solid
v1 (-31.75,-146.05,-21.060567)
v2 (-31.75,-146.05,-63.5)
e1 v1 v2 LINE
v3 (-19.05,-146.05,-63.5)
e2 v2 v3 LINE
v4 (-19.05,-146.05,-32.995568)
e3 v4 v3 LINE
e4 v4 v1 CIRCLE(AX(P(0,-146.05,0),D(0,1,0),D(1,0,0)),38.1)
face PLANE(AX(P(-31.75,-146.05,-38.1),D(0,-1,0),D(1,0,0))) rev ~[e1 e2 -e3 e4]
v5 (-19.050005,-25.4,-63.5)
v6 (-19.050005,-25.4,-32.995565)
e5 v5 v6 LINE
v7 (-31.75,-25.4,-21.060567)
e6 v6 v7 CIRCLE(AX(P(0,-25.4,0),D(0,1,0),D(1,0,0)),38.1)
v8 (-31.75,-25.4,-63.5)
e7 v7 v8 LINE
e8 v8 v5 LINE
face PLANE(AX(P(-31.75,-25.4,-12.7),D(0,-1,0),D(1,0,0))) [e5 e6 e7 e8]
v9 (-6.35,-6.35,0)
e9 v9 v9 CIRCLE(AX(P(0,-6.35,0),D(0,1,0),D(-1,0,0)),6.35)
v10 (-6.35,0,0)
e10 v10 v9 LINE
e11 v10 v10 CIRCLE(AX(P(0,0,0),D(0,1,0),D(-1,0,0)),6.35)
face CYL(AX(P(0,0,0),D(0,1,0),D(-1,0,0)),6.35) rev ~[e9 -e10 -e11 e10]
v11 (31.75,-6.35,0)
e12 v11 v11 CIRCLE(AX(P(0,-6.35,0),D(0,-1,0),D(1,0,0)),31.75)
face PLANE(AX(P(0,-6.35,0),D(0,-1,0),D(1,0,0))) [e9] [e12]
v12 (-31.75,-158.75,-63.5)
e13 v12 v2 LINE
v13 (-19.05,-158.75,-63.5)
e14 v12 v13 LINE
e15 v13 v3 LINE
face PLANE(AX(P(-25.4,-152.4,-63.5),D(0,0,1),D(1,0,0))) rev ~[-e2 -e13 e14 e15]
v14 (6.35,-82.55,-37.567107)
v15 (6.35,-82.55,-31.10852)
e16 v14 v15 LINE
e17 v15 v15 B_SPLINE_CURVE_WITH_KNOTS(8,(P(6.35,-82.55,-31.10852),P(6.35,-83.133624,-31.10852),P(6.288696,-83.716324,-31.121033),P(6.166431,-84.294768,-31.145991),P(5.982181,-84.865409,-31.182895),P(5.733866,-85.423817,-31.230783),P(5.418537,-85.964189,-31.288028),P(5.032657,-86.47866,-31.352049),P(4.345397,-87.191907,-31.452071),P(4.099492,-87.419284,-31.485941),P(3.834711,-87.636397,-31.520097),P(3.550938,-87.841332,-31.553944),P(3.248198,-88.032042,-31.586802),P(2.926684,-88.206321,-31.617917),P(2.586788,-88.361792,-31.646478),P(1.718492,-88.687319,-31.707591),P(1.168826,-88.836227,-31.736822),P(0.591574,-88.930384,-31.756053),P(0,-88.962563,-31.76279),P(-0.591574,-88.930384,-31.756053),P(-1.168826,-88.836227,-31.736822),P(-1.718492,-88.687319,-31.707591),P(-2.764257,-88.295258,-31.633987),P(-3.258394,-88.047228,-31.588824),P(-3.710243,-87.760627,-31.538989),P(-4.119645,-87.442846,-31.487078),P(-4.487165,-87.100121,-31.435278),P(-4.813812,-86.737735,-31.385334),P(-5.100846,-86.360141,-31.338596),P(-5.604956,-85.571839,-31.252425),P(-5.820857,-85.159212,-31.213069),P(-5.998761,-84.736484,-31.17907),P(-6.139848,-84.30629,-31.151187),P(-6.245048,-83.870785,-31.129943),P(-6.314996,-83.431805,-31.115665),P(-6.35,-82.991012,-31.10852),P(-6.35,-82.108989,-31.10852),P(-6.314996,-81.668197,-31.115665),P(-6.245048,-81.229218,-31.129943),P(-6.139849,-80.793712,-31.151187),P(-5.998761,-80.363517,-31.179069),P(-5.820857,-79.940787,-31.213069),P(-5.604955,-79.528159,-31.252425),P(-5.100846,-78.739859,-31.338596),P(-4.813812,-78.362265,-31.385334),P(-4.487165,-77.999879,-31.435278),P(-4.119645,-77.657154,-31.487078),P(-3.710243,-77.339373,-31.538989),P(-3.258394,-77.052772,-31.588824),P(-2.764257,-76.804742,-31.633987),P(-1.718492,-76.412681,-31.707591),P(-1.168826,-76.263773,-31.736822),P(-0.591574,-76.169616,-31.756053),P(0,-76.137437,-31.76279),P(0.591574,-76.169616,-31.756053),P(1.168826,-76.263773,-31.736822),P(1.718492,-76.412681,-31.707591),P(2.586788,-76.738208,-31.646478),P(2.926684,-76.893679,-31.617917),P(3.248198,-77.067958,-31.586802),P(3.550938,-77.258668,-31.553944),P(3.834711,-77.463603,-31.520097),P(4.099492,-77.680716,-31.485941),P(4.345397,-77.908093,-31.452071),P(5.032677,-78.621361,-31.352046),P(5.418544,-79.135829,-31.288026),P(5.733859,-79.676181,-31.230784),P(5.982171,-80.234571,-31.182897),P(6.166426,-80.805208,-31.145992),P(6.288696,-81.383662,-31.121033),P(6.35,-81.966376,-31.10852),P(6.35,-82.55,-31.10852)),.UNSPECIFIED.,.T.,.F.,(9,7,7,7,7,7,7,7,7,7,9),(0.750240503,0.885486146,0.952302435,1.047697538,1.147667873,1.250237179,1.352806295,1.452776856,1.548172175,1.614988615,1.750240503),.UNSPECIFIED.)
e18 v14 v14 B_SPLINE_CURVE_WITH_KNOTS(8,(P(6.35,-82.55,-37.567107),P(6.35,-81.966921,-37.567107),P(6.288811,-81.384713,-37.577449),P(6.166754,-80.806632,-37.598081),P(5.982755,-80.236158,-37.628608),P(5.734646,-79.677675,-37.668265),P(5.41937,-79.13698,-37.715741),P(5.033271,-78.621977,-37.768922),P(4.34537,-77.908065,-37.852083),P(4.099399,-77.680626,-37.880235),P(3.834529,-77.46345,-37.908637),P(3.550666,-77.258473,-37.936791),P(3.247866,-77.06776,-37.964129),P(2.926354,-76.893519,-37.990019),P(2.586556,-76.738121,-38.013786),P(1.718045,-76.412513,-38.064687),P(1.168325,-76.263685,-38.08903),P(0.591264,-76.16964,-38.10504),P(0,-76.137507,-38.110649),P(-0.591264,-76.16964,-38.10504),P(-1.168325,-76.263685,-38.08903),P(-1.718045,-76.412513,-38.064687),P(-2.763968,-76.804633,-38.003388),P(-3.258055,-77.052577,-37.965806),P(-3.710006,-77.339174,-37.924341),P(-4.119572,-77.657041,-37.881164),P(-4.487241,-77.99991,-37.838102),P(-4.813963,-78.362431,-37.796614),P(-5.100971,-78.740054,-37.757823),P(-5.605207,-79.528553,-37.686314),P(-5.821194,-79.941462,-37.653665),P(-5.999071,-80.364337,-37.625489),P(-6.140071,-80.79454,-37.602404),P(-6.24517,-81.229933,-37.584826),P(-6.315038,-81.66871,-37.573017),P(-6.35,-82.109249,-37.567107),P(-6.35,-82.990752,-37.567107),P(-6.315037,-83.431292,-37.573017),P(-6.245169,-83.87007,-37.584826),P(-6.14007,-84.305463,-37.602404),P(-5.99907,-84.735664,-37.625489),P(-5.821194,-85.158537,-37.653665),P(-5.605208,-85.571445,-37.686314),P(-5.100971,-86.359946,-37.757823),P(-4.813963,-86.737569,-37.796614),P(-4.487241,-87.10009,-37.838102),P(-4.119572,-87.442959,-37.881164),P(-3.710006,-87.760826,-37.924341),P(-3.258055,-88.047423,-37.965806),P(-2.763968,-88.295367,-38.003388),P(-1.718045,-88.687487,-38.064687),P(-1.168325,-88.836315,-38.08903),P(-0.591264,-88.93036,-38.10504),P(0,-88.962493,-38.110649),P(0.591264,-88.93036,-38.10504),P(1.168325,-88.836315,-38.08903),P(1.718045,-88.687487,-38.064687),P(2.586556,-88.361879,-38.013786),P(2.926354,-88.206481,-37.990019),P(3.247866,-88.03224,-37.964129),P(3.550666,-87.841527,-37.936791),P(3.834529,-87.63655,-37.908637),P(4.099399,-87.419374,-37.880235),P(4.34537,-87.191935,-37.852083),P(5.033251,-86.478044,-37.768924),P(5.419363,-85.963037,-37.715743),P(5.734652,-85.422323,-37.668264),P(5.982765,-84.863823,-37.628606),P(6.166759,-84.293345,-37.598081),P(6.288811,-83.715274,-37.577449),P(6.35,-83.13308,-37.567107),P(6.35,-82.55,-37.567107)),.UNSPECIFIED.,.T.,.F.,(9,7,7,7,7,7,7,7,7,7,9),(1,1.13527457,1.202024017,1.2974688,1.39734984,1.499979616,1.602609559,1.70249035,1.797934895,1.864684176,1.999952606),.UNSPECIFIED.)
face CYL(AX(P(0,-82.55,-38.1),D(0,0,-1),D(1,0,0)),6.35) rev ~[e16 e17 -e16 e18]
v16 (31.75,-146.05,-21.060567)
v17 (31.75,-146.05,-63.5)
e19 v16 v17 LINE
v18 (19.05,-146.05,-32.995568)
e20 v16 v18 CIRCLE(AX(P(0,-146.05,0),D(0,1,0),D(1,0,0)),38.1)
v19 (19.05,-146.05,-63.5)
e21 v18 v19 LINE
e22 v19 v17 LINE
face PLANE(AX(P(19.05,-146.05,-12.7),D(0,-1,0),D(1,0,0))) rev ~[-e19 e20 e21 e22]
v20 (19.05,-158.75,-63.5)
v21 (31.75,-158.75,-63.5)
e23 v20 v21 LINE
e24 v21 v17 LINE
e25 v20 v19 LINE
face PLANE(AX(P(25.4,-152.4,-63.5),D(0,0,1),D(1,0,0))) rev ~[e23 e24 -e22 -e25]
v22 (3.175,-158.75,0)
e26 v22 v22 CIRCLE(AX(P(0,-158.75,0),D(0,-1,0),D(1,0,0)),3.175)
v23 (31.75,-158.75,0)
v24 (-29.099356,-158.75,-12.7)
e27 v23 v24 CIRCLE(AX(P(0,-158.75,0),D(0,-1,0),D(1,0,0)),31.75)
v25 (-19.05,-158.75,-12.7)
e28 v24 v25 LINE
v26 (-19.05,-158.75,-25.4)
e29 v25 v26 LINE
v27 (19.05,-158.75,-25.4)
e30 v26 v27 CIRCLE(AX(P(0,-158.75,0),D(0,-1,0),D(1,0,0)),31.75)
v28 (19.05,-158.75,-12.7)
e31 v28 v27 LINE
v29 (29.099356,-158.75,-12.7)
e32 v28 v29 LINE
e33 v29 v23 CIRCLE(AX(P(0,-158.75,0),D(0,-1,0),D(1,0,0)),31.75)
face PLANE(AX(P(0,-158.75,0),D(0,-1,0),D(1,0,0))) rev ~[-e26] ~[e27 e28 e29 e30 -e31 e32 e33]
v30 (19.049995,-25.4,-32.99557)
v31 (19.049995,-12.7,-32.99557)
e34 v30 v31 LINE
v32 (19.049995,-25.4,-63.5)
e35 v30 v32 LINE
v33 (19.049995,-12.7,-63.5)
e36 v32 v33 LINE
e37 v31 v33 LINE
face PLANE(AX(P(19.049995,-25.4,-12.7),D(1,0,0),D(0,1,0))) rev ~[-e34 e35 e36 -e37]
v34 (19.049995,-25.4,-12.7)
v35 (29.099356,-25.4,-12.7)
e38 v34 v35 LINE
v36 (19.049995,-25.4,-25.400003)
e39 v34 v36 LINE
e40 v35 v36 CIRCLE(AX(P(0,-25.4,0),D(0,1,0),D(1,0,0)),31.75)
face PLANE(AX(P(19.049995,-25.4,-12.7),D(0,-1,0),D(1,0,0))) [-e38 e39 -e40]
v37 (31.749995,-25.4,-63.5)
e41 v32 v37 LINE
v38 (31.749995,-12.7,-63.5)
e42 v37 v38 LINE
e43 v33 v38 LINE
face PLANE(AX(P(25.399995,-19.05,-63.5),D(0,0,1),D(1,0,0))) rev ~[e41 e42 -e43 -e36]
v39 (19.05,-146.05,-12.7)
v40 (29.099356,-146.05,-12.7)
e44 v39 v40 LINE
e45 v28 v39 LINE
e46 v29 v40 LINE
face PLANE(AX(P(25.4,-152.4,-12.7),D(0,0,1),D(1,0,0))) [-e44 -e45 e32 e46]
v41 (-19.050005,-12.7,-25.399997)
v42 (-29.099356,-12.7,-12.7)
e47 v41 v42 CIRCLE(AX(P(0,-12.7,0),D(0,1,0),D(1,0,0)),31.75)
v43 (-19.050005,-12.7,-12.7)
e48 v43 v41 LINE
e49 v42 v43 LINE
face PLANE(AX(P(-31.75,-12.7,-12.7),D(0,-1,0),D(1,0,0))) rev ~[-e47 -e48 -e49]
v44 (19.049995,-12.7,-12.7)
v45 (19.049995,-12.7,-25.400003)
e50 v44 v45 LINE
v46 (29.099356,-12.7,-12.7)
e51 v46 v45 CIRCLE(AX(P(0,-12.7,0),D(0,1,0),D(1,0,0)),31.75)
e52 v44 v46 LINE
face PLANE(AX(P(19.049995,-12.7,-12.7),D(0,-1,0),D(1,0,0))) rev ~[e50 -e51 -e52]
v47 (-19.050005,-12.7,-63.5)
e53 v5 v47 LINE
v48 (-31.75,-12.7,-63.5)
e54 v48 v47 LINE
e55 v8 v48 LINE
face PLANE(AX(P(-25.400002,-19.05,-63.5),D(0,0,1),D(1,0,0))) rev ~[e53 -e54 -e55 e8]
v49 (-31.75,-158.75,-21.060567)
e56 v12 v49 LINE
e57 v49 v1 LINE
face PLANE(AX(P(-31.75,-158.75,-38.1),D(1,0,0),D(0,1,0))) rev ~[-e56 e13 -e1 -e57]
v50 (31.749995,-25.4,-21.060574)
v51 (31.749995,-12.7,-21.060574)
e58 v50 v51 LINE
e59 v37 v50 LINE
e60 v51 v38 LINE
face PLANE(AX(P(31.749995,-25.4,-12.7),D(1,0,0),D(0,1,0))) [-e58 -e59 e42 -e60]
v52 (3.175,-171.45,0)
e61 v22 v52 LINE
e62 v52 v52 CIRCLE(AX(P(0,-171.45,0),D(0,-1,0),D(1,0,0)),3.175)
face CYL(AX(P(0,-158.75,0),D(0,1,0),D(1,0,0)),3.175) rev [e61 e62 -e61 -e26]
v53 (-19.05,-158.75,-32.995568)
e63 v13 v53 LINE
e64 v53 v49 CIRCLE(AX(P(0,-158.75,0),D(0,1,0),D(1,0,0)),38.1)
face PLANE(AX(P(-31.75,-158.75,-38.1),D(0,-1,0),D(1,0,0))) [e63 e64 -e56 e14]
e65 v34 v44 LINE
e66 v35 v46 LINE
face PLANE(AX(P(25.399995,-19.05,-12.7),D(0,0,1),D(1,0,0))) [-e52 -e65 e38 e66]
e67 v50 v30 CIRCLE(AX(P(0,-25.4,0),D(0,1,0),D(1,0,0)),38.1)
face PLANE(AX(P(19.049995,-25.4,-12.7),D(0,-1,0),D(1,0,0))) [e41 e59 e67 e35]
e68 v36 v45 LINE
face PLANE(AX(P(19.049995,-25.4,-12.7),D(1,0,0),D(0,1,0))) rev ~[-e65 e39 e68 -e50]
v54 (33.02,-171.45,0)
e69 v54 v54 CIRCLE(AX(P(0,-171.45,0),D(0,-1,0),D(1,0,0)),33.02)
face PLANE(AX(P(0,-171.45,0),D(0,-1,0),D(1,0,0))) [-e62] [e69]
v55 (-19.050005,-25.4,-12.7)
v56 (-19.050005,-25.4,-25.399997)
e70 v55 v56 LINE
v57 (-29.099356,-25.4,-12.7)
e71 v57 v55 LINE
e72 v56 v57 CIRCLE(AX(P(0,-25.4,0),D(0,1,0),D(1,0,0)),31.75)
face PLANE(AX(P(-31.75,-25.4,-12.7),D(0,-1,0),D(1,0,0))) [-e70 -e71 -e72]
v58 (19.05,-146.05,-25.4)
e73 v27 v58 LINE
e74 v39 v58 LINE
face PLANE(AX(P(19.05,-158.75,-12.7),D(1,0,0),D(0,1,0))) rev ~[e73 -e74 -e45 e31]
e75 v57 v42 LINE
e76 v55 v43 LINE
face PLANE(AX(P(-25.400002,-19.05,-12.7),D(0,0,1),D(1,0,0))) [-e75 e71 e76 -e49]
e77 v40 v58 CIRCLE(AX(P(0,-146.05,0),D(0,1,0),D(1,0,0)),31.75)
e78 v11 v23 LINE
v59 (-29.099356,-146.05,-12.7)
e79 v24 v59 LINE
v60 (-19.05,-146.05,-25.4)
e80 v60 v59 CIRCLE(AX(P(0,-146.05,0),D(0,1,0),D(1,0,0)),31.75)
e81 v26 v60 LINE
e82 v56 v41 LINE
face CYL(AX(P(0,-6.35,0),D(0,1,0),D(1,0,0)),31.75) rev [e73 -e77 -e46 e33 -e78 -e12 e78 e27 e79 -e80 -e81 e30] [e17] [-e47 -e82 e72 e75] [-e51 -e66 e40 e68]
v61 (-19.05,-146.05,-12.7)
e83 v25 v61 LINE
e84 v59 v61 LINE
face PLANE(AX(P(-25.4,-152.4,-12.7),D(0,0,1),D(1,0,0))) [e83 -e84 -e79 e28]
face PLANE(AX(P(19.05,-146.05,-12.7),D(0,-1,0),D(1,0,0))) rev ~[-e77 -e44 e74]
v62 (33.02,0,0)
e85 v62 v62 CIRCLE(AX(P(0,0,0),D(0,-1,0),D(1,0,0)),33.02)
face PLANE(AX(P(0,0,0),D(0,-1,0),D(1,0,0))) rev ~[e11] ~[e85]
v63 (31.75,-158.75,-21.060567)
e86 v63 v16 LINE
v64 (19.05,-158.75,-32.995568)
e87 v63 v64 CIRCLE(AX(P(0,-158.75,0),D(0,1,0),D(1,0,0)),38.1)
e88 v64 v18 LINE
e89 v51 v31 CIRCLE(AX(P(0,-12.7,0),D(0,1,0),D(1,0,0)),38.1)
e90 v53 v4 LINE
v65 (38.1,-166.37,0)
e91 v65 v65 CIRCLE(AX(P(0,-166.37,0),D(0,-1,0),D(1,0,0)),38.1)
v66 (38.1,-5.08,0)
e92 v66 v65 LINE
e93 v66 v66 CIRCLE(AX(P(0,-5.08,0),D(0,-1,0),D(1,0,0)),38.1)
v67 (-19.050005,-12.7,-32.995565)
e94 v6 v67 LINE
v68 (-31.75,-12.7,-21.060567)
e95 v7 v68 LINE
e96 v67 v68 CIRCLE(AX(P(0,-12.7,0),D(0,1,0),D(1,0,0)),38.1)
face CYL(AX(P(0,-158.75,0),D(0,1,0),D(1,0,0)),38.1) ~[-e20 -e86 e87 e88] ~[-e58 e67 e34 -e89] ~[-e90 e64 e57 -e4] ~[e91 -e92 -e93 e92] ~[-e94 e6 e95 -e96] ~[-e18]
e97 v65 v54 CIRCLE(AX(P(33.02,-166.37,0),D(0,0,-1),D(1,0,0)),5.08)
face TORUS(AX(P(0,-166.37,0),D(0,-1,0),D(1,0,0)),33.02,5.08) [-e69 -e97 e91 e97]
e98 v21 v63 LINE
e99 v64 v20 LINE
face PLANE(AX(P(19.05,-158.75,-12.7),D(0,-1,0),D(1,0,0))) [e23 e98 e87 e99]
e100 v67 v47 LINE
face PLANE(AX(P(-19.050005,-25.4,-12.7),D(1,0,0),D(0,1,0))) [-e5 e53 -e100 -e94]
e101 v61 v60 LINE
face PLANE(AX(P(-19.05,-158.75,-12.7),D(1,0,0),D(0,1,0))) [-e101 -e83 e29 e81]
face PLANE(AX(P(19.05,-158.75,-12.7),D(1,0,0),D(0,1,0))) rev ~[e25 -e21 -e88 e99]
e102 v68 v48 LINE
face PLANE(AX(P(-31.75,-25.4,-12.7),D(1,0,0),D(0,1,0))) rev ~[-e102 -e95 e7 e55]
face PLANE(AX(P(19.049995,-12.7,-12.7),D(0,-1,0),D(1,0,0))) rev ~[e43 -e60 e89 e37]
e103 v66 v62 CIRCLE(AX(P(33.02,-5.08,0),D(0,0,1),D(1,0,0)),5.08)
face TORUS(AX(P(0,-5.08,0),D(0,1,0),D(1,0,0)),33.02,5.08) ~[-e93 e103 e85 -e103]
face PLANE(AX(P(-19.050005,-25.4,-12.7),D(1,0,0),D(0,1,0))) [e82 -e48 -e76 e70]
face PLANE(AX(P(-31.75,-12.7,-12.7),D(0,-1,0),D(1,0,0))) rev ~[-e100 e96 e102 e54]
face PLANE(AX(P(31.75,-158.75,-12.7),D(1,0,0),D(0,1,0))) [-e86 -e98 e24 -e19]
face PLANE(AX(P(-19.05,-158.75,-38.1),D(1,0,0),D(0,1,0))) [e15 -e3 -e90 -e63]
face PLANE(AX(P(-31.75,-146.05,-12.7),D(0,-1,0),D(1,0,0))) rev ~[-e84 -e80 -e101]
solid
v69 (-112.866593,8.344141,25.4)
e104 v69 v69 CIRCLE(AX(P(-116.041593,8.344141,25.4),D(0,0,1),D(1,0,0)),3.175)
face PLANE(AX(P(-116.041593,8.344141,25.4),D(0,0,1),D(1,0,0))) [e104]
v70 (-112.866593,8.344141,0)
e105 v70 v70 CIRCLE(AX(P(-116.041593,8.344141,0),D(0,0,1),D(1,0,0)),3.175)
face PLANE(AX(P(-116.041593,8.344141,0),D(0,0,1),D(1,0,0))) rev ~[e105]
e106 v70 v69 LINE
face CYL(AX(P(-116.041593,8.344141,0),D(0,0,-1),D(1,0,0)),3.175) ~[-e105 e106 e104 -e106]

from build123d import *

# Parameters (mm, degrees)
F0_R      = 38.1
F1_DEPTH  = 6.35
F2_R      = 38.1
F2_R_2    = 31.75
F3_DEPTH  = 152.4
F4_R      = 38.1
F4_R_2    = 3.175
F5_DEPTH  = 12.7
F6_R      = 6.35
F7_DEPTH  = 25.4
F8_R      = 5.08
F10_W     = 12.7
F10_H     = 12.7
F10_W_2   = 12.6999954973
F10_R     = 6.35
F11_DEPTH = 25.4
F12_DEPTH = 25.4
F13_DEPTH = 25.4
F15_DEPTH = 25.4
F16_R     = 6.35
F17_DEPTH = 25.4
F18_R     = 3.175
F19_DEPTH = 25.4


with BuildPart() as f1:
    # F0 (on Front) → F1 (new body)
    with BuildSketch(Plane.XZ):
        Circle(F0_R)
    extrude(amount=F1_DEPTH)

    # F2 (on face) → F3 (join)
    with BuildSketch(Plane.XZ.offset(6.35)):
        Circle(F2_R)
        Circle(F2_R_2, mode=Mode.SUBTRACT)
    extrude(amount=F3_DEPTH)

    # F4 (on face) → F5 (join)
    with BuildSketch(Plane.XZ.offset(158.75)):
        Circle(F4_R)
        Circle(F4_R_2, mode=Mode.SUBTRACT)
    extrude(amount=F5_DEPTH)

    # F6 (on face) → F7 (cut)
    with BuildSketch(Plane(origin=(0, 0, 0), x_dir=(-1, 0, 0), z_dir=(0, 1, 0))):
        Circle(F6_R)
    extrude(amount=-F7_DEPTH, mode=Mode.SUBTRACT)

    # F8
    f8_edges = [f1.edges().sort_by_distance(p)[0] for p in [
        (-38.1, 0, 0),
        (-38.1, -171.45, 0),
    ]]
    fillet(f8_edges, radius=F8_R)

    # F10 (on offset) → F11 (join)
    with BuildSketch(Plane.XY.offset(-12.7)):
        with Locations((-25.4, -152.4)):
            Rectangle(F10_W, F10_H)
        with Locations((25.4, -152.4)):
            Rectangle(F10_W, F10_H)
        with Locations((-25.4000022513, -19.05)):
            Rectangle(F10_W_2, F10_H)
        with Locations((25.3999954973, -19.05)):
            Rectangle(F10_W, F10_H)
        with Locations((0, -82.55)):
            Circle(F10_R)
    extrude(amount=-F11_DEPTH)

    # F12 (add): faces of the model
    f12_faces = [f1.faces().sort_by_distance(p)[0] for p in [
        (-25.4, -152.4, -38.1),
        (-25.4000022513, -19.05, -38.1),
        (25.3999954973, -19.05, -38.1),
        (25.4, -152.4, -38.1),
    ]]
    extrude(f12_faces, amount=F12_DEPTH)

    # F13 (add): a face of the model
    f13_faces = [f1.faces().sort_by_distance(p)[0] for p in [
        (0, -82.55, -38.1),
    ]]
    extrude(f13_faces, amount=-F13_DEPTH)

    # F14 (on face) → F15 (join)
    with BuildSketch(Plane(origin=(0, 0, -38.1), x_dir=(1, 0, 0), z_dir=(0, 0, -1))):
        with BuildLine():
            ThreePointArc((-6.743e-07, 88.9), (-6.35, 82.5499993257), (6.743e-07, 76.2))
            ThreePointArc((6.743e-07, 76.2), (6.35, 82.5500006743), (-6.743e-07, 88.9))
        make_face()
    extrude(amount=-F15_DEPTH)

    # F16 (on face) → F17 (cut)
    with BuildSketch(Plane(origin=(0, 0, -38.1), x_dir=(1, 0, 0), z_dir=(0, 0, -1))):
        with Locations((0, 82.55)):
            Circle(F16_R)
    extrude(amount=-F17_DEPTH, mode=Mode.SUBTRACT)


with BuildPart() as f19:
    # F18 (on Top) → F19 (new body)
    with BuildSketch(Plane.XY):
        with Locations((-116.0415932536, 8.3441408351)):
            Circle(F18_R)
    extrude(amount=F19_DEPTH)


solid = Compound([f1.part, f19.part])
